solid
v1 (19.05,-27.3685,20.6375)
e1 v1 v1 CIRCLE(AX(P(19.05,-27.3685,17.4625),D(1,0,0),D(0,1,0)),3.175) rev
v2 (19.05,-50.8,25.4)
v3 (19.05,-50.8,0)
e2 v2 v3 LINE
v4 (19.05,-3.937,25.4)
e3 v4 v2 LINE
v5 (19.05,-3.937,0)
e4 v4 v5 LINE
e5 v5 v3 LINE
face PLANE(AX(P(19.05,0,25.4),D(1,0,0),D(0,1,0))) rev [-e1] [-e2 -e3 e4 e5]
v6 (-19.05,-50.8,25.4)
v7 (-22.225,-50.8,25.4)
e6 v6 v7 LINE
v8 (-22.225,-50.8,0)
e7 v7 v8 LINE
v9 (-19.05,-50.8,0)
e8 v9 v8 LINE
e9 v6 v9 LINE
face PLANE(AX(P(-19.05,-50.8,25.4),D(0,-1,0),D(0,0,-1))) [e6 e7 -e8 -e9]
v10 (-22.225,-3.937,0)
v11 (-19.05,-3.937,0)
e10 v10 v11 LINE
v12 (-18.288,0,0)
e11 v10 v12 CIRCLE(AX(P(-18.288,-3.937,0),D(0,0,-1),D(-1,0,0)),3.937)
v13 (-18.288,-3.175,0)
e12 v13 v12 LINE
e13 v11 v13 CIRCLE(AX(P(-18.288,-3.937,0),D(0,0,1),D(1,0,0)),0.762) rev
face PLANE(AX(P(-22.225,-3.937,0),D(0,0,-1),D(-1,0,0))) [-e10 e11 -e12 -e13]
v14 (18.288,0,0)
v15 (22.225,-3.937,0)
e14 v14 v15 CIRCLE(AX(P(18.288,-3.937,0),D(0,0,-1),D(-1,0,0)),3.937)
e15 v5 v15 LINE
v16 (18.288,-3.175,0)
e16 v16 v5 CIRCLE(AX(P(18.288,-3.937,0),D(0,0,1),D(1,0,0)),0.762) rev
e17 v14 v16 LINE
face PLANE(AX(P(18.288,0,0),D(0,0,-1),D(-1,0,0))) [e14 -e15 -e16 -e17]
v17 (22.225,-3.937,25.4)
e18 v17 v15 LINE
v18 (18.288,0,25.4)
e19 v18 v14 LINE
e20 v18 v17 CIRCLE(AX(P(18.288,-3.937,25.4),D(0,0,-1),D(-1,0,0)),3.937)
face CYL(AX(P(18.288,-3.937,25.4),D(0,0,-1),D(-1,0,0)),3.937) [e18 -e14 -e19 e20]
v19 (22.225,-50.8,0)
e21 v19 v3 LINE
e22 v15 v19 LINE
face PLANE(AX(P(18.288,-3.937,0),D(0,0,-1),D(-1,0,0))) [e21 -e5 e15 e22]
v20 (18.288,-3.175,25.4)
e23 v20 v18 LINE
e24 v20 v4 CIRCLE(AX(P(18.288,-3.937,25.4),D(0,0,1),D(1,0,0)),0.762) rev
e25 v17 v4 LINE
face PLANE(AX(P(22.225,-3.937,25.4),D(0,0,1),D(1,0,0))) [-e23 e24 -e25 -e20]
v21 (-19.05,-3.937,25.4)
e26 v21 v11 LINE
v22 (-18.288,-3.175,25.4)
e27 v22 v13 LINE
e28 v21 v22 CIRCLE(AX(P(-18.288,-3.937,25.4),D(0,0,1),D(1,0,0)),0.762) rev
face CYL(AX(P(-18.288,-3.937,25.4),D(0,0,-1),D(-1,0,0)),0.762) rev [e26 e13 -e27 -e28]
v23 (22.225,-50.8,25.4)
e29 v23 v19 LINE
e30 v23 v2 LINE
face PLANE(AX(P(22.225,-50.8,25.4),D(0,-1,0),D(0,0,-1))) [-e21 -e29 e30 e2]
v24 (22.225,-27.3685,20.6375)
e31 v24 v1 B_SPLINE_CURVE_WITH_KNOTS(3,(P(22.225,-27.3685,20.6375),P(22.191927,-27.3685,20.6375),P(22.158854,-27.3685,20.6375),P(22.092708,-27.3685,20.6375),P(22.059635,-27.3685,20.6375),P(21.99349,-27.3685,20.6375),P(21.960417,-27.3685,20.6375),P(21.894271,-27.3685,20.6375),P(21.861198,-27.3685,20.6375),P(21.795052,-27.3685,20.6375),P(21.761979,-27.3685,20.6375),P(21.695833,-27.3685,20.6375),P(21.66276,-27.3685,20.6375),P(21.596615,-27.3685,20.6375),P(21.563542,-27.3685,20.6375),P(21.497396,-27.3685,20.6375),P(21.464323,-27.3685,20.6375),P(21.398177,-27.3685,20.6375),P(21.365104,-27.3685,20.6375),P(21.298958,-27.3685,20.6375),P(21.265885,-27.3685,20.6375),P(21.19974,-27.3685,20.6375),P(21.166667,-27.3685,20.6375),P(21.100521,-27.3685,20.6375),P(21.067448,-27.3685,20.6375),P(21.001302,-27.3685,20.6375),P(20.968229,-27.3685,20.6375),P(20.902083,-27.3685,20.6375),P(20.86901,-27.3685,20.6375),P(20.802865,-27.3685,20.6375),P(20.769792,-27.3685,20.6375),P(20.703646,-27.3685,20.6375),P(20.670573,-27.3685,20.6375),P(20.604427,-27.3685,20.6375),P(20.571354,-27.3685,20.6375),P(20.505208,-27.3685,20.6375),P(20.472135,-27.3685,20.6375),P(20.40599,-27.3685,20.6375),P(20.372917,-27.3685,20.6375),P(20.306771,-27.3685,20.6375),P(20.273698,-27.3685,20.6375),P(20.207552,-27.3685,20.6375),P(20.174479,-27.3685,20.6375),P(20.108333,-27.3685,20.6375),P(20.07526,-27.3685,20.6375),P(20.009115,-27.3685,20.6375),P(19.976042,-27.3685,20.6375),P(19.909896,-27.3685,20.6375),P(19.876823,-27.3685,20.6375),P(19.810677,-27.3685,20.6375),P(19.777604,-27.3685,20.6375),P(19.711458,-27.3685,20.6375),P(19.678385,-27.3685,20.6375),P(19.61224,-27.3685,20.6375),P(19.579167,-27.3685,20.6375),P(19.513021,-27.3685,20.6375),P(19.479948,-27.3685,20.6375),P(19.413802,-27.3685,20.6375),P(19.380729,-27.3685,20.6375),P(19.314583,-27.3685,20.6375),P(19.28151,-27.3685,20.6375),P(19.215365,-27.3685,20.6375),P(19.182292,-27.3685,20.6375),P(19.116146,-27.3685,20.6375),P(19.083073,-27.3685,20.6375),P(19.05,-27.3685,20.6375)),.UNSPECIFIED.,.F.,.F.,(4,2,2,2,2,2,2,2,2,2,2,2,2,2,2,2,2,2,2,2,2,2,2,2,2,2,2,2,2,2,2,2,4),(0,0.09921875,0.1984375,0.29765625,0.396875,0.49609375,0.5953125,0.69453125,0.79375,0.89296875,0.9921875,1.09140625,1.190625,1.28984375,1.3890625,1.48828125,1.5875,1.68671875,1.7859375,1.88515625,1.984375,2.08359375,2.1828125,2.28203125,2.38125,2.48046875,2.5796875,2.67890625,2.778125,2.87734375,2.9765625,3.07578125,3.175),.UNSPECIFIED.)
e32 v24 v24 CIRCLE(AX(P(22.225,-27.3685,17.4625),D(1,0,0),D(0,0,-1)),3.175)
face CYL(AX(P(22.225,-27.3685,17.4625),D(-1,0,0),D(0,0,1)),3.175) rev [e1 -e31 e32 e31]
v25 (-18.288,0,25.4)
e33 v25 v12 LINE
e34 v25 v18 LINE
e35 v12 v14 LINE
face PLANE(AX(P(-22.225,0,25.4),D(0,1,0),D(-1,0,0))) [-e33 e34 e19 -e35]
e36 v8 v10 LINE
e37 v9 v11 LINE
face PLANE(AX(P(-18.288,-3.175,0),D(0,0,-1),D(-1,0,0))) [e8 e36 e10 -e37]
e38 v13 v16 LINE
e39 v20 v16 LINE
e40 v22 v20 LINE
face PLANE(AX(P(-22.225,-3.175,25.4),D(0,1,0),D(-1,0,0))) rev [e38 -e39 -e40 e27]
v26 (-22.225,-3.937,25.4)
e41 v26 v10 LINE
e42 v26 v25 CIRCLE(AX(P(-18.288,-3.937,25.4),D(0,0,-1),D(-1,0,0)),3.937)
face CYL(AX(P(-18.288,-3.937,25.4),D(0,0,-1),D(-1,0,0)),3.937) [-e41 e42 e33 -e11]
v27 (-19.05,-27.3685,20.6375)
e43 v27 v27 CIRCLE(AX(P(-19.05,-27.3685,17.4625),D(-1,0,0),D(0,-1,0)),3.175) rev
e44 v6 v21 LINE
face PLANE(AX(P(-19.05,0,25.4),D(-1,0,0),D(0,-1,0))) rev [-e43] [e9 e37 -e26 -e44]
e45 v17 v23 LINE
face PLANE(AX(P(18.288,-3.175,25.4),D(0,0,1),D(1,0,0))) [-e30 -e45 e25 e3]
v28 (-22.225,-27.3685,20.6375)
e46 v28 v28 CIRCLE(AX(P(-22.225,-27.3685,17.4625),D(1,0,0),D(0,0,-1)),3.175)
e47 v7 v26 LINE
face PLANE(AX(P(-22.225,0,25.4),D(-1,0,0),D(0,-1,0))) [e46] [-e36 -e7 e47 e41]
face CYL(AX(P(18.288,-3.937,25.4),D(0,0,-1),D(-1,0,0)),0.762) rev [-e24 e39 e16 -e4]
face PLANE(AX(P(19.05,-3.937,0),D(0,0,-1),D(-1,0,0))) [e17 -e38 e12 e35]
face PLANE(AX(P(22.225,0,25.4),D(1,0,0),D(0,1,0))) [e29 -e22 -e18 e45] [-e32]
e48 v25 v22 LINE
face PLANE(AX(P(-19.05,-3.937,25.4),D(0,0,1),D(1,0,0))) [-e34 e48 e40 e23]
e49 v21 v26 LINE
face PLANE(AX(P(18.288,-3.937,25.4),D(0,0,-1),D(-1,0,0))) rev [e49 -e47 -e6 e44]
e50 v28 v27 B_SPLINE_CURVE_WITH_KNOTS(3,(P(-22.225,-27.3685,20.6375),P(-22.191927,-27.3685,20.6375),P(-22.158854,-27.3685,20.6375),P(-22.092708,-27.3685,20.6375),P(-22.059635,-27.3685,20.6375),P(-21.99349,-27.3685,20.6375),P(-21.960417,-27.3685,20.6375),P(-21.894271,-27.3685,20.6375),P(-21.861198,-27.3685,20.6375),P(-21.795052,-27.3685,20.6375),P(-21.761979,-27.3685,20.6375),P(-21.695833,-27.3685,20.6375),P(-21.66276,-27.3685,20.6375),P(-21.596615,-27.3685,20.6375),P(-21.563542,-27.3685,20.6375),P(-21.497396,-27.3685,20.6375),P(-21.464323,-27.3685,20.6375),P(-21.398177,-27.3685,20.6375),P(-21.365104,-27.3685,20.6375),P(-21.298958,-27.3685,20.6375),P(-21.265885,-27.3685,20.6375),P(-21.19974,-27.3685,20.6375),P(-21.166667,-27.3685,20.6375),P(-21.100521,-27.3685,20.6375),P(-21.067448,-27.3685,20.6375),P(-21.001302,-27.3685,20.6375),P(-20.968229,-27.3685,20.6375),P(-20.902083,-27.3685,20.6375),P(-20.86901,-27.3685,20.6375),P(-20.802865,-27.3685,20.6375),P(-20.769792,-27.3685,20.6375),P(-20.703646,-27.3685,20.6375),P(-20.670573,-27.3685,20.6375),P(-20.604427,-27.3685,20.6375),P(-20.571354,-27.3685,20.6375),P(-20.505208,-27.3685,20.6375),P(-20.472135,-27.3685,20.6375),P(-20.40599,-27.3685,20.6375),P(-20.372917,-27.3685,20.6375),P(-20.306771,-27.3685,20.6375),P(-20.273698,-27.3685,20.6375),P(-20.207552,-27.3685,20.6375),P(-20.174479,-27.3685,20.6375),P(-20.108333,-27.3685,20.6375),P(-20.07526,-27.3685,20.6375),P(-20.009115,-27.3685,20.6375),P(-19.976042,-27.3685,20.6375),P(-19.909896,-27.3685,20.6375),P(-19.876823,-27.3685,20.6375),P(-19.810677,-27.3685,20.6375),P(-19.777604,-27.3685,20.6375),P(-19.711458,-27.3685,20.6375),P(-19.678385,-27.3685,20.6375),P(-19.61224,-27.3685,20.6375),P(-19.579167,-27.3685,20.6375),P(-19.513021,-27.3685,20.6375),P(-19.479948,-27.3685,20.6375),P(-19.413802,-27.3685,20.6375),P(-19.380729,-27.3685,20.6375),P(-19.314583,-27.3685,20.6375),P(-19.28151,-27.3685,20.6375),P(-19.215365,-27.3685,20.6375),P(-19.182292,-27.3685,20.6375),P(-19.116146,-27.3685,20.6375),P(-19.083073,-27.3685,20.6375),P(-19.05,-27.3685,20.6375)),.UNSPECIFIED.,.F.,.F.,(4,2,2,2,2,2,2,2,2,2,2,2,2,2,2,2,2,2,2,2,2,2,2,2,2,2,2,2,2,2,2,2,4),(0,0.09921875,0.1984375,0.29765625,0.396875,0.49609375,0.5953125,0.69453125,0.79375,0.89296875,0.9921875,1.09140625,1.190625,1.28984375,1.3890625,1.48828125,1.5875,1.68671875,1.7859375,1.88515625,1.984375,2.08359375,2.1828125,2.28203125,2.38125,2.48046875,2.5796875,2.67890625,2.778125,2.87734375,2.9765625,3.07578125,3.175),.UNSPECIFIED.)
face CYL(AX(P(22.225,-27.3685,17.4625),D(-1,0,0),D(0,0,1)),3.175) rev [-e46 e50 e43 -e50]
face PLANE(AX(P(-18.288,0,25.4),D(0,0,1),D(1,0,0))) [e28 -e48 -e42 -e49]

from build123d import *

# Parameters (mm, degrees)
BASE_FLANGE2_DEPTH      = 25.4
CUT_EXTRUDE1_DEPTH      = 61.989758362
CUT_EXTRUDE1_DEPTH_BACK = 61.989758362
SKETCH10_R              = 3.175


# Sheet-metal steps are written as plain solids
with BuildPart() as part:
    # Sketch1 → Base-Flange2 (new body)
    with BuildSketch(Plane.XY):
        with BuildLine():
            Line((-22.225, -50.8), (-22.225, -3.937))
            ThreePointArc((-22.225, -3.937), (-21.071879398, -1.153120602), (-18.288, 0))
            Line((-18.288, 0), (18.288, 0))
            ThreePointArc((18.288, 0), (21.071879398, -1.153120602), (22.225, -3.937))
            Line((22.225, -3.937), (22.225, -50.8))
            Line((22.225, -50.8), (19.05, -50.8))
            Line((19.05, -50.8), (19.05, -3.937))
            ThreePointArc((19.05, -3.937), (18.826815367, -3.398184633), (18.288, -3.175))
            Line((18.288, -3.175), (-18.288, -3.175))
            ThreePointArc((-18.288, -3.175), (-18.826815367, -3.398184633), (-19.05, -3.937))
            Line((-19.05, -3.937), (-19.05, -50.8))
            Line((-19.05, -50.8), (-22.225, -50.8))
        make_face()
    extrude(amount=BASE_FLANGE2_DEPTH)

    # Sketch10 → Cut-Extrude1 (cut, two sides: drawn at the far end of the back side and taken through both)
    with BuildSketch(Plane(origin=(0, 0, 0), x_dir=(0, 0, -1), z_dir=(1, 0, 0)).offset(-CUT_EXTRUDE1_DEPTH_BACK)):
        with Locations(Location((-17.4625, -27.3685, 0), (0, 0, 180))):
            Circle(SKETCH10_R)
    extrude(amount=CUT_EXTRUDE1_DEPTH + CUT_EXTRUDE1_DEPTH_BACK, mode=Mode.SUBTRACT)


solid = part.part
